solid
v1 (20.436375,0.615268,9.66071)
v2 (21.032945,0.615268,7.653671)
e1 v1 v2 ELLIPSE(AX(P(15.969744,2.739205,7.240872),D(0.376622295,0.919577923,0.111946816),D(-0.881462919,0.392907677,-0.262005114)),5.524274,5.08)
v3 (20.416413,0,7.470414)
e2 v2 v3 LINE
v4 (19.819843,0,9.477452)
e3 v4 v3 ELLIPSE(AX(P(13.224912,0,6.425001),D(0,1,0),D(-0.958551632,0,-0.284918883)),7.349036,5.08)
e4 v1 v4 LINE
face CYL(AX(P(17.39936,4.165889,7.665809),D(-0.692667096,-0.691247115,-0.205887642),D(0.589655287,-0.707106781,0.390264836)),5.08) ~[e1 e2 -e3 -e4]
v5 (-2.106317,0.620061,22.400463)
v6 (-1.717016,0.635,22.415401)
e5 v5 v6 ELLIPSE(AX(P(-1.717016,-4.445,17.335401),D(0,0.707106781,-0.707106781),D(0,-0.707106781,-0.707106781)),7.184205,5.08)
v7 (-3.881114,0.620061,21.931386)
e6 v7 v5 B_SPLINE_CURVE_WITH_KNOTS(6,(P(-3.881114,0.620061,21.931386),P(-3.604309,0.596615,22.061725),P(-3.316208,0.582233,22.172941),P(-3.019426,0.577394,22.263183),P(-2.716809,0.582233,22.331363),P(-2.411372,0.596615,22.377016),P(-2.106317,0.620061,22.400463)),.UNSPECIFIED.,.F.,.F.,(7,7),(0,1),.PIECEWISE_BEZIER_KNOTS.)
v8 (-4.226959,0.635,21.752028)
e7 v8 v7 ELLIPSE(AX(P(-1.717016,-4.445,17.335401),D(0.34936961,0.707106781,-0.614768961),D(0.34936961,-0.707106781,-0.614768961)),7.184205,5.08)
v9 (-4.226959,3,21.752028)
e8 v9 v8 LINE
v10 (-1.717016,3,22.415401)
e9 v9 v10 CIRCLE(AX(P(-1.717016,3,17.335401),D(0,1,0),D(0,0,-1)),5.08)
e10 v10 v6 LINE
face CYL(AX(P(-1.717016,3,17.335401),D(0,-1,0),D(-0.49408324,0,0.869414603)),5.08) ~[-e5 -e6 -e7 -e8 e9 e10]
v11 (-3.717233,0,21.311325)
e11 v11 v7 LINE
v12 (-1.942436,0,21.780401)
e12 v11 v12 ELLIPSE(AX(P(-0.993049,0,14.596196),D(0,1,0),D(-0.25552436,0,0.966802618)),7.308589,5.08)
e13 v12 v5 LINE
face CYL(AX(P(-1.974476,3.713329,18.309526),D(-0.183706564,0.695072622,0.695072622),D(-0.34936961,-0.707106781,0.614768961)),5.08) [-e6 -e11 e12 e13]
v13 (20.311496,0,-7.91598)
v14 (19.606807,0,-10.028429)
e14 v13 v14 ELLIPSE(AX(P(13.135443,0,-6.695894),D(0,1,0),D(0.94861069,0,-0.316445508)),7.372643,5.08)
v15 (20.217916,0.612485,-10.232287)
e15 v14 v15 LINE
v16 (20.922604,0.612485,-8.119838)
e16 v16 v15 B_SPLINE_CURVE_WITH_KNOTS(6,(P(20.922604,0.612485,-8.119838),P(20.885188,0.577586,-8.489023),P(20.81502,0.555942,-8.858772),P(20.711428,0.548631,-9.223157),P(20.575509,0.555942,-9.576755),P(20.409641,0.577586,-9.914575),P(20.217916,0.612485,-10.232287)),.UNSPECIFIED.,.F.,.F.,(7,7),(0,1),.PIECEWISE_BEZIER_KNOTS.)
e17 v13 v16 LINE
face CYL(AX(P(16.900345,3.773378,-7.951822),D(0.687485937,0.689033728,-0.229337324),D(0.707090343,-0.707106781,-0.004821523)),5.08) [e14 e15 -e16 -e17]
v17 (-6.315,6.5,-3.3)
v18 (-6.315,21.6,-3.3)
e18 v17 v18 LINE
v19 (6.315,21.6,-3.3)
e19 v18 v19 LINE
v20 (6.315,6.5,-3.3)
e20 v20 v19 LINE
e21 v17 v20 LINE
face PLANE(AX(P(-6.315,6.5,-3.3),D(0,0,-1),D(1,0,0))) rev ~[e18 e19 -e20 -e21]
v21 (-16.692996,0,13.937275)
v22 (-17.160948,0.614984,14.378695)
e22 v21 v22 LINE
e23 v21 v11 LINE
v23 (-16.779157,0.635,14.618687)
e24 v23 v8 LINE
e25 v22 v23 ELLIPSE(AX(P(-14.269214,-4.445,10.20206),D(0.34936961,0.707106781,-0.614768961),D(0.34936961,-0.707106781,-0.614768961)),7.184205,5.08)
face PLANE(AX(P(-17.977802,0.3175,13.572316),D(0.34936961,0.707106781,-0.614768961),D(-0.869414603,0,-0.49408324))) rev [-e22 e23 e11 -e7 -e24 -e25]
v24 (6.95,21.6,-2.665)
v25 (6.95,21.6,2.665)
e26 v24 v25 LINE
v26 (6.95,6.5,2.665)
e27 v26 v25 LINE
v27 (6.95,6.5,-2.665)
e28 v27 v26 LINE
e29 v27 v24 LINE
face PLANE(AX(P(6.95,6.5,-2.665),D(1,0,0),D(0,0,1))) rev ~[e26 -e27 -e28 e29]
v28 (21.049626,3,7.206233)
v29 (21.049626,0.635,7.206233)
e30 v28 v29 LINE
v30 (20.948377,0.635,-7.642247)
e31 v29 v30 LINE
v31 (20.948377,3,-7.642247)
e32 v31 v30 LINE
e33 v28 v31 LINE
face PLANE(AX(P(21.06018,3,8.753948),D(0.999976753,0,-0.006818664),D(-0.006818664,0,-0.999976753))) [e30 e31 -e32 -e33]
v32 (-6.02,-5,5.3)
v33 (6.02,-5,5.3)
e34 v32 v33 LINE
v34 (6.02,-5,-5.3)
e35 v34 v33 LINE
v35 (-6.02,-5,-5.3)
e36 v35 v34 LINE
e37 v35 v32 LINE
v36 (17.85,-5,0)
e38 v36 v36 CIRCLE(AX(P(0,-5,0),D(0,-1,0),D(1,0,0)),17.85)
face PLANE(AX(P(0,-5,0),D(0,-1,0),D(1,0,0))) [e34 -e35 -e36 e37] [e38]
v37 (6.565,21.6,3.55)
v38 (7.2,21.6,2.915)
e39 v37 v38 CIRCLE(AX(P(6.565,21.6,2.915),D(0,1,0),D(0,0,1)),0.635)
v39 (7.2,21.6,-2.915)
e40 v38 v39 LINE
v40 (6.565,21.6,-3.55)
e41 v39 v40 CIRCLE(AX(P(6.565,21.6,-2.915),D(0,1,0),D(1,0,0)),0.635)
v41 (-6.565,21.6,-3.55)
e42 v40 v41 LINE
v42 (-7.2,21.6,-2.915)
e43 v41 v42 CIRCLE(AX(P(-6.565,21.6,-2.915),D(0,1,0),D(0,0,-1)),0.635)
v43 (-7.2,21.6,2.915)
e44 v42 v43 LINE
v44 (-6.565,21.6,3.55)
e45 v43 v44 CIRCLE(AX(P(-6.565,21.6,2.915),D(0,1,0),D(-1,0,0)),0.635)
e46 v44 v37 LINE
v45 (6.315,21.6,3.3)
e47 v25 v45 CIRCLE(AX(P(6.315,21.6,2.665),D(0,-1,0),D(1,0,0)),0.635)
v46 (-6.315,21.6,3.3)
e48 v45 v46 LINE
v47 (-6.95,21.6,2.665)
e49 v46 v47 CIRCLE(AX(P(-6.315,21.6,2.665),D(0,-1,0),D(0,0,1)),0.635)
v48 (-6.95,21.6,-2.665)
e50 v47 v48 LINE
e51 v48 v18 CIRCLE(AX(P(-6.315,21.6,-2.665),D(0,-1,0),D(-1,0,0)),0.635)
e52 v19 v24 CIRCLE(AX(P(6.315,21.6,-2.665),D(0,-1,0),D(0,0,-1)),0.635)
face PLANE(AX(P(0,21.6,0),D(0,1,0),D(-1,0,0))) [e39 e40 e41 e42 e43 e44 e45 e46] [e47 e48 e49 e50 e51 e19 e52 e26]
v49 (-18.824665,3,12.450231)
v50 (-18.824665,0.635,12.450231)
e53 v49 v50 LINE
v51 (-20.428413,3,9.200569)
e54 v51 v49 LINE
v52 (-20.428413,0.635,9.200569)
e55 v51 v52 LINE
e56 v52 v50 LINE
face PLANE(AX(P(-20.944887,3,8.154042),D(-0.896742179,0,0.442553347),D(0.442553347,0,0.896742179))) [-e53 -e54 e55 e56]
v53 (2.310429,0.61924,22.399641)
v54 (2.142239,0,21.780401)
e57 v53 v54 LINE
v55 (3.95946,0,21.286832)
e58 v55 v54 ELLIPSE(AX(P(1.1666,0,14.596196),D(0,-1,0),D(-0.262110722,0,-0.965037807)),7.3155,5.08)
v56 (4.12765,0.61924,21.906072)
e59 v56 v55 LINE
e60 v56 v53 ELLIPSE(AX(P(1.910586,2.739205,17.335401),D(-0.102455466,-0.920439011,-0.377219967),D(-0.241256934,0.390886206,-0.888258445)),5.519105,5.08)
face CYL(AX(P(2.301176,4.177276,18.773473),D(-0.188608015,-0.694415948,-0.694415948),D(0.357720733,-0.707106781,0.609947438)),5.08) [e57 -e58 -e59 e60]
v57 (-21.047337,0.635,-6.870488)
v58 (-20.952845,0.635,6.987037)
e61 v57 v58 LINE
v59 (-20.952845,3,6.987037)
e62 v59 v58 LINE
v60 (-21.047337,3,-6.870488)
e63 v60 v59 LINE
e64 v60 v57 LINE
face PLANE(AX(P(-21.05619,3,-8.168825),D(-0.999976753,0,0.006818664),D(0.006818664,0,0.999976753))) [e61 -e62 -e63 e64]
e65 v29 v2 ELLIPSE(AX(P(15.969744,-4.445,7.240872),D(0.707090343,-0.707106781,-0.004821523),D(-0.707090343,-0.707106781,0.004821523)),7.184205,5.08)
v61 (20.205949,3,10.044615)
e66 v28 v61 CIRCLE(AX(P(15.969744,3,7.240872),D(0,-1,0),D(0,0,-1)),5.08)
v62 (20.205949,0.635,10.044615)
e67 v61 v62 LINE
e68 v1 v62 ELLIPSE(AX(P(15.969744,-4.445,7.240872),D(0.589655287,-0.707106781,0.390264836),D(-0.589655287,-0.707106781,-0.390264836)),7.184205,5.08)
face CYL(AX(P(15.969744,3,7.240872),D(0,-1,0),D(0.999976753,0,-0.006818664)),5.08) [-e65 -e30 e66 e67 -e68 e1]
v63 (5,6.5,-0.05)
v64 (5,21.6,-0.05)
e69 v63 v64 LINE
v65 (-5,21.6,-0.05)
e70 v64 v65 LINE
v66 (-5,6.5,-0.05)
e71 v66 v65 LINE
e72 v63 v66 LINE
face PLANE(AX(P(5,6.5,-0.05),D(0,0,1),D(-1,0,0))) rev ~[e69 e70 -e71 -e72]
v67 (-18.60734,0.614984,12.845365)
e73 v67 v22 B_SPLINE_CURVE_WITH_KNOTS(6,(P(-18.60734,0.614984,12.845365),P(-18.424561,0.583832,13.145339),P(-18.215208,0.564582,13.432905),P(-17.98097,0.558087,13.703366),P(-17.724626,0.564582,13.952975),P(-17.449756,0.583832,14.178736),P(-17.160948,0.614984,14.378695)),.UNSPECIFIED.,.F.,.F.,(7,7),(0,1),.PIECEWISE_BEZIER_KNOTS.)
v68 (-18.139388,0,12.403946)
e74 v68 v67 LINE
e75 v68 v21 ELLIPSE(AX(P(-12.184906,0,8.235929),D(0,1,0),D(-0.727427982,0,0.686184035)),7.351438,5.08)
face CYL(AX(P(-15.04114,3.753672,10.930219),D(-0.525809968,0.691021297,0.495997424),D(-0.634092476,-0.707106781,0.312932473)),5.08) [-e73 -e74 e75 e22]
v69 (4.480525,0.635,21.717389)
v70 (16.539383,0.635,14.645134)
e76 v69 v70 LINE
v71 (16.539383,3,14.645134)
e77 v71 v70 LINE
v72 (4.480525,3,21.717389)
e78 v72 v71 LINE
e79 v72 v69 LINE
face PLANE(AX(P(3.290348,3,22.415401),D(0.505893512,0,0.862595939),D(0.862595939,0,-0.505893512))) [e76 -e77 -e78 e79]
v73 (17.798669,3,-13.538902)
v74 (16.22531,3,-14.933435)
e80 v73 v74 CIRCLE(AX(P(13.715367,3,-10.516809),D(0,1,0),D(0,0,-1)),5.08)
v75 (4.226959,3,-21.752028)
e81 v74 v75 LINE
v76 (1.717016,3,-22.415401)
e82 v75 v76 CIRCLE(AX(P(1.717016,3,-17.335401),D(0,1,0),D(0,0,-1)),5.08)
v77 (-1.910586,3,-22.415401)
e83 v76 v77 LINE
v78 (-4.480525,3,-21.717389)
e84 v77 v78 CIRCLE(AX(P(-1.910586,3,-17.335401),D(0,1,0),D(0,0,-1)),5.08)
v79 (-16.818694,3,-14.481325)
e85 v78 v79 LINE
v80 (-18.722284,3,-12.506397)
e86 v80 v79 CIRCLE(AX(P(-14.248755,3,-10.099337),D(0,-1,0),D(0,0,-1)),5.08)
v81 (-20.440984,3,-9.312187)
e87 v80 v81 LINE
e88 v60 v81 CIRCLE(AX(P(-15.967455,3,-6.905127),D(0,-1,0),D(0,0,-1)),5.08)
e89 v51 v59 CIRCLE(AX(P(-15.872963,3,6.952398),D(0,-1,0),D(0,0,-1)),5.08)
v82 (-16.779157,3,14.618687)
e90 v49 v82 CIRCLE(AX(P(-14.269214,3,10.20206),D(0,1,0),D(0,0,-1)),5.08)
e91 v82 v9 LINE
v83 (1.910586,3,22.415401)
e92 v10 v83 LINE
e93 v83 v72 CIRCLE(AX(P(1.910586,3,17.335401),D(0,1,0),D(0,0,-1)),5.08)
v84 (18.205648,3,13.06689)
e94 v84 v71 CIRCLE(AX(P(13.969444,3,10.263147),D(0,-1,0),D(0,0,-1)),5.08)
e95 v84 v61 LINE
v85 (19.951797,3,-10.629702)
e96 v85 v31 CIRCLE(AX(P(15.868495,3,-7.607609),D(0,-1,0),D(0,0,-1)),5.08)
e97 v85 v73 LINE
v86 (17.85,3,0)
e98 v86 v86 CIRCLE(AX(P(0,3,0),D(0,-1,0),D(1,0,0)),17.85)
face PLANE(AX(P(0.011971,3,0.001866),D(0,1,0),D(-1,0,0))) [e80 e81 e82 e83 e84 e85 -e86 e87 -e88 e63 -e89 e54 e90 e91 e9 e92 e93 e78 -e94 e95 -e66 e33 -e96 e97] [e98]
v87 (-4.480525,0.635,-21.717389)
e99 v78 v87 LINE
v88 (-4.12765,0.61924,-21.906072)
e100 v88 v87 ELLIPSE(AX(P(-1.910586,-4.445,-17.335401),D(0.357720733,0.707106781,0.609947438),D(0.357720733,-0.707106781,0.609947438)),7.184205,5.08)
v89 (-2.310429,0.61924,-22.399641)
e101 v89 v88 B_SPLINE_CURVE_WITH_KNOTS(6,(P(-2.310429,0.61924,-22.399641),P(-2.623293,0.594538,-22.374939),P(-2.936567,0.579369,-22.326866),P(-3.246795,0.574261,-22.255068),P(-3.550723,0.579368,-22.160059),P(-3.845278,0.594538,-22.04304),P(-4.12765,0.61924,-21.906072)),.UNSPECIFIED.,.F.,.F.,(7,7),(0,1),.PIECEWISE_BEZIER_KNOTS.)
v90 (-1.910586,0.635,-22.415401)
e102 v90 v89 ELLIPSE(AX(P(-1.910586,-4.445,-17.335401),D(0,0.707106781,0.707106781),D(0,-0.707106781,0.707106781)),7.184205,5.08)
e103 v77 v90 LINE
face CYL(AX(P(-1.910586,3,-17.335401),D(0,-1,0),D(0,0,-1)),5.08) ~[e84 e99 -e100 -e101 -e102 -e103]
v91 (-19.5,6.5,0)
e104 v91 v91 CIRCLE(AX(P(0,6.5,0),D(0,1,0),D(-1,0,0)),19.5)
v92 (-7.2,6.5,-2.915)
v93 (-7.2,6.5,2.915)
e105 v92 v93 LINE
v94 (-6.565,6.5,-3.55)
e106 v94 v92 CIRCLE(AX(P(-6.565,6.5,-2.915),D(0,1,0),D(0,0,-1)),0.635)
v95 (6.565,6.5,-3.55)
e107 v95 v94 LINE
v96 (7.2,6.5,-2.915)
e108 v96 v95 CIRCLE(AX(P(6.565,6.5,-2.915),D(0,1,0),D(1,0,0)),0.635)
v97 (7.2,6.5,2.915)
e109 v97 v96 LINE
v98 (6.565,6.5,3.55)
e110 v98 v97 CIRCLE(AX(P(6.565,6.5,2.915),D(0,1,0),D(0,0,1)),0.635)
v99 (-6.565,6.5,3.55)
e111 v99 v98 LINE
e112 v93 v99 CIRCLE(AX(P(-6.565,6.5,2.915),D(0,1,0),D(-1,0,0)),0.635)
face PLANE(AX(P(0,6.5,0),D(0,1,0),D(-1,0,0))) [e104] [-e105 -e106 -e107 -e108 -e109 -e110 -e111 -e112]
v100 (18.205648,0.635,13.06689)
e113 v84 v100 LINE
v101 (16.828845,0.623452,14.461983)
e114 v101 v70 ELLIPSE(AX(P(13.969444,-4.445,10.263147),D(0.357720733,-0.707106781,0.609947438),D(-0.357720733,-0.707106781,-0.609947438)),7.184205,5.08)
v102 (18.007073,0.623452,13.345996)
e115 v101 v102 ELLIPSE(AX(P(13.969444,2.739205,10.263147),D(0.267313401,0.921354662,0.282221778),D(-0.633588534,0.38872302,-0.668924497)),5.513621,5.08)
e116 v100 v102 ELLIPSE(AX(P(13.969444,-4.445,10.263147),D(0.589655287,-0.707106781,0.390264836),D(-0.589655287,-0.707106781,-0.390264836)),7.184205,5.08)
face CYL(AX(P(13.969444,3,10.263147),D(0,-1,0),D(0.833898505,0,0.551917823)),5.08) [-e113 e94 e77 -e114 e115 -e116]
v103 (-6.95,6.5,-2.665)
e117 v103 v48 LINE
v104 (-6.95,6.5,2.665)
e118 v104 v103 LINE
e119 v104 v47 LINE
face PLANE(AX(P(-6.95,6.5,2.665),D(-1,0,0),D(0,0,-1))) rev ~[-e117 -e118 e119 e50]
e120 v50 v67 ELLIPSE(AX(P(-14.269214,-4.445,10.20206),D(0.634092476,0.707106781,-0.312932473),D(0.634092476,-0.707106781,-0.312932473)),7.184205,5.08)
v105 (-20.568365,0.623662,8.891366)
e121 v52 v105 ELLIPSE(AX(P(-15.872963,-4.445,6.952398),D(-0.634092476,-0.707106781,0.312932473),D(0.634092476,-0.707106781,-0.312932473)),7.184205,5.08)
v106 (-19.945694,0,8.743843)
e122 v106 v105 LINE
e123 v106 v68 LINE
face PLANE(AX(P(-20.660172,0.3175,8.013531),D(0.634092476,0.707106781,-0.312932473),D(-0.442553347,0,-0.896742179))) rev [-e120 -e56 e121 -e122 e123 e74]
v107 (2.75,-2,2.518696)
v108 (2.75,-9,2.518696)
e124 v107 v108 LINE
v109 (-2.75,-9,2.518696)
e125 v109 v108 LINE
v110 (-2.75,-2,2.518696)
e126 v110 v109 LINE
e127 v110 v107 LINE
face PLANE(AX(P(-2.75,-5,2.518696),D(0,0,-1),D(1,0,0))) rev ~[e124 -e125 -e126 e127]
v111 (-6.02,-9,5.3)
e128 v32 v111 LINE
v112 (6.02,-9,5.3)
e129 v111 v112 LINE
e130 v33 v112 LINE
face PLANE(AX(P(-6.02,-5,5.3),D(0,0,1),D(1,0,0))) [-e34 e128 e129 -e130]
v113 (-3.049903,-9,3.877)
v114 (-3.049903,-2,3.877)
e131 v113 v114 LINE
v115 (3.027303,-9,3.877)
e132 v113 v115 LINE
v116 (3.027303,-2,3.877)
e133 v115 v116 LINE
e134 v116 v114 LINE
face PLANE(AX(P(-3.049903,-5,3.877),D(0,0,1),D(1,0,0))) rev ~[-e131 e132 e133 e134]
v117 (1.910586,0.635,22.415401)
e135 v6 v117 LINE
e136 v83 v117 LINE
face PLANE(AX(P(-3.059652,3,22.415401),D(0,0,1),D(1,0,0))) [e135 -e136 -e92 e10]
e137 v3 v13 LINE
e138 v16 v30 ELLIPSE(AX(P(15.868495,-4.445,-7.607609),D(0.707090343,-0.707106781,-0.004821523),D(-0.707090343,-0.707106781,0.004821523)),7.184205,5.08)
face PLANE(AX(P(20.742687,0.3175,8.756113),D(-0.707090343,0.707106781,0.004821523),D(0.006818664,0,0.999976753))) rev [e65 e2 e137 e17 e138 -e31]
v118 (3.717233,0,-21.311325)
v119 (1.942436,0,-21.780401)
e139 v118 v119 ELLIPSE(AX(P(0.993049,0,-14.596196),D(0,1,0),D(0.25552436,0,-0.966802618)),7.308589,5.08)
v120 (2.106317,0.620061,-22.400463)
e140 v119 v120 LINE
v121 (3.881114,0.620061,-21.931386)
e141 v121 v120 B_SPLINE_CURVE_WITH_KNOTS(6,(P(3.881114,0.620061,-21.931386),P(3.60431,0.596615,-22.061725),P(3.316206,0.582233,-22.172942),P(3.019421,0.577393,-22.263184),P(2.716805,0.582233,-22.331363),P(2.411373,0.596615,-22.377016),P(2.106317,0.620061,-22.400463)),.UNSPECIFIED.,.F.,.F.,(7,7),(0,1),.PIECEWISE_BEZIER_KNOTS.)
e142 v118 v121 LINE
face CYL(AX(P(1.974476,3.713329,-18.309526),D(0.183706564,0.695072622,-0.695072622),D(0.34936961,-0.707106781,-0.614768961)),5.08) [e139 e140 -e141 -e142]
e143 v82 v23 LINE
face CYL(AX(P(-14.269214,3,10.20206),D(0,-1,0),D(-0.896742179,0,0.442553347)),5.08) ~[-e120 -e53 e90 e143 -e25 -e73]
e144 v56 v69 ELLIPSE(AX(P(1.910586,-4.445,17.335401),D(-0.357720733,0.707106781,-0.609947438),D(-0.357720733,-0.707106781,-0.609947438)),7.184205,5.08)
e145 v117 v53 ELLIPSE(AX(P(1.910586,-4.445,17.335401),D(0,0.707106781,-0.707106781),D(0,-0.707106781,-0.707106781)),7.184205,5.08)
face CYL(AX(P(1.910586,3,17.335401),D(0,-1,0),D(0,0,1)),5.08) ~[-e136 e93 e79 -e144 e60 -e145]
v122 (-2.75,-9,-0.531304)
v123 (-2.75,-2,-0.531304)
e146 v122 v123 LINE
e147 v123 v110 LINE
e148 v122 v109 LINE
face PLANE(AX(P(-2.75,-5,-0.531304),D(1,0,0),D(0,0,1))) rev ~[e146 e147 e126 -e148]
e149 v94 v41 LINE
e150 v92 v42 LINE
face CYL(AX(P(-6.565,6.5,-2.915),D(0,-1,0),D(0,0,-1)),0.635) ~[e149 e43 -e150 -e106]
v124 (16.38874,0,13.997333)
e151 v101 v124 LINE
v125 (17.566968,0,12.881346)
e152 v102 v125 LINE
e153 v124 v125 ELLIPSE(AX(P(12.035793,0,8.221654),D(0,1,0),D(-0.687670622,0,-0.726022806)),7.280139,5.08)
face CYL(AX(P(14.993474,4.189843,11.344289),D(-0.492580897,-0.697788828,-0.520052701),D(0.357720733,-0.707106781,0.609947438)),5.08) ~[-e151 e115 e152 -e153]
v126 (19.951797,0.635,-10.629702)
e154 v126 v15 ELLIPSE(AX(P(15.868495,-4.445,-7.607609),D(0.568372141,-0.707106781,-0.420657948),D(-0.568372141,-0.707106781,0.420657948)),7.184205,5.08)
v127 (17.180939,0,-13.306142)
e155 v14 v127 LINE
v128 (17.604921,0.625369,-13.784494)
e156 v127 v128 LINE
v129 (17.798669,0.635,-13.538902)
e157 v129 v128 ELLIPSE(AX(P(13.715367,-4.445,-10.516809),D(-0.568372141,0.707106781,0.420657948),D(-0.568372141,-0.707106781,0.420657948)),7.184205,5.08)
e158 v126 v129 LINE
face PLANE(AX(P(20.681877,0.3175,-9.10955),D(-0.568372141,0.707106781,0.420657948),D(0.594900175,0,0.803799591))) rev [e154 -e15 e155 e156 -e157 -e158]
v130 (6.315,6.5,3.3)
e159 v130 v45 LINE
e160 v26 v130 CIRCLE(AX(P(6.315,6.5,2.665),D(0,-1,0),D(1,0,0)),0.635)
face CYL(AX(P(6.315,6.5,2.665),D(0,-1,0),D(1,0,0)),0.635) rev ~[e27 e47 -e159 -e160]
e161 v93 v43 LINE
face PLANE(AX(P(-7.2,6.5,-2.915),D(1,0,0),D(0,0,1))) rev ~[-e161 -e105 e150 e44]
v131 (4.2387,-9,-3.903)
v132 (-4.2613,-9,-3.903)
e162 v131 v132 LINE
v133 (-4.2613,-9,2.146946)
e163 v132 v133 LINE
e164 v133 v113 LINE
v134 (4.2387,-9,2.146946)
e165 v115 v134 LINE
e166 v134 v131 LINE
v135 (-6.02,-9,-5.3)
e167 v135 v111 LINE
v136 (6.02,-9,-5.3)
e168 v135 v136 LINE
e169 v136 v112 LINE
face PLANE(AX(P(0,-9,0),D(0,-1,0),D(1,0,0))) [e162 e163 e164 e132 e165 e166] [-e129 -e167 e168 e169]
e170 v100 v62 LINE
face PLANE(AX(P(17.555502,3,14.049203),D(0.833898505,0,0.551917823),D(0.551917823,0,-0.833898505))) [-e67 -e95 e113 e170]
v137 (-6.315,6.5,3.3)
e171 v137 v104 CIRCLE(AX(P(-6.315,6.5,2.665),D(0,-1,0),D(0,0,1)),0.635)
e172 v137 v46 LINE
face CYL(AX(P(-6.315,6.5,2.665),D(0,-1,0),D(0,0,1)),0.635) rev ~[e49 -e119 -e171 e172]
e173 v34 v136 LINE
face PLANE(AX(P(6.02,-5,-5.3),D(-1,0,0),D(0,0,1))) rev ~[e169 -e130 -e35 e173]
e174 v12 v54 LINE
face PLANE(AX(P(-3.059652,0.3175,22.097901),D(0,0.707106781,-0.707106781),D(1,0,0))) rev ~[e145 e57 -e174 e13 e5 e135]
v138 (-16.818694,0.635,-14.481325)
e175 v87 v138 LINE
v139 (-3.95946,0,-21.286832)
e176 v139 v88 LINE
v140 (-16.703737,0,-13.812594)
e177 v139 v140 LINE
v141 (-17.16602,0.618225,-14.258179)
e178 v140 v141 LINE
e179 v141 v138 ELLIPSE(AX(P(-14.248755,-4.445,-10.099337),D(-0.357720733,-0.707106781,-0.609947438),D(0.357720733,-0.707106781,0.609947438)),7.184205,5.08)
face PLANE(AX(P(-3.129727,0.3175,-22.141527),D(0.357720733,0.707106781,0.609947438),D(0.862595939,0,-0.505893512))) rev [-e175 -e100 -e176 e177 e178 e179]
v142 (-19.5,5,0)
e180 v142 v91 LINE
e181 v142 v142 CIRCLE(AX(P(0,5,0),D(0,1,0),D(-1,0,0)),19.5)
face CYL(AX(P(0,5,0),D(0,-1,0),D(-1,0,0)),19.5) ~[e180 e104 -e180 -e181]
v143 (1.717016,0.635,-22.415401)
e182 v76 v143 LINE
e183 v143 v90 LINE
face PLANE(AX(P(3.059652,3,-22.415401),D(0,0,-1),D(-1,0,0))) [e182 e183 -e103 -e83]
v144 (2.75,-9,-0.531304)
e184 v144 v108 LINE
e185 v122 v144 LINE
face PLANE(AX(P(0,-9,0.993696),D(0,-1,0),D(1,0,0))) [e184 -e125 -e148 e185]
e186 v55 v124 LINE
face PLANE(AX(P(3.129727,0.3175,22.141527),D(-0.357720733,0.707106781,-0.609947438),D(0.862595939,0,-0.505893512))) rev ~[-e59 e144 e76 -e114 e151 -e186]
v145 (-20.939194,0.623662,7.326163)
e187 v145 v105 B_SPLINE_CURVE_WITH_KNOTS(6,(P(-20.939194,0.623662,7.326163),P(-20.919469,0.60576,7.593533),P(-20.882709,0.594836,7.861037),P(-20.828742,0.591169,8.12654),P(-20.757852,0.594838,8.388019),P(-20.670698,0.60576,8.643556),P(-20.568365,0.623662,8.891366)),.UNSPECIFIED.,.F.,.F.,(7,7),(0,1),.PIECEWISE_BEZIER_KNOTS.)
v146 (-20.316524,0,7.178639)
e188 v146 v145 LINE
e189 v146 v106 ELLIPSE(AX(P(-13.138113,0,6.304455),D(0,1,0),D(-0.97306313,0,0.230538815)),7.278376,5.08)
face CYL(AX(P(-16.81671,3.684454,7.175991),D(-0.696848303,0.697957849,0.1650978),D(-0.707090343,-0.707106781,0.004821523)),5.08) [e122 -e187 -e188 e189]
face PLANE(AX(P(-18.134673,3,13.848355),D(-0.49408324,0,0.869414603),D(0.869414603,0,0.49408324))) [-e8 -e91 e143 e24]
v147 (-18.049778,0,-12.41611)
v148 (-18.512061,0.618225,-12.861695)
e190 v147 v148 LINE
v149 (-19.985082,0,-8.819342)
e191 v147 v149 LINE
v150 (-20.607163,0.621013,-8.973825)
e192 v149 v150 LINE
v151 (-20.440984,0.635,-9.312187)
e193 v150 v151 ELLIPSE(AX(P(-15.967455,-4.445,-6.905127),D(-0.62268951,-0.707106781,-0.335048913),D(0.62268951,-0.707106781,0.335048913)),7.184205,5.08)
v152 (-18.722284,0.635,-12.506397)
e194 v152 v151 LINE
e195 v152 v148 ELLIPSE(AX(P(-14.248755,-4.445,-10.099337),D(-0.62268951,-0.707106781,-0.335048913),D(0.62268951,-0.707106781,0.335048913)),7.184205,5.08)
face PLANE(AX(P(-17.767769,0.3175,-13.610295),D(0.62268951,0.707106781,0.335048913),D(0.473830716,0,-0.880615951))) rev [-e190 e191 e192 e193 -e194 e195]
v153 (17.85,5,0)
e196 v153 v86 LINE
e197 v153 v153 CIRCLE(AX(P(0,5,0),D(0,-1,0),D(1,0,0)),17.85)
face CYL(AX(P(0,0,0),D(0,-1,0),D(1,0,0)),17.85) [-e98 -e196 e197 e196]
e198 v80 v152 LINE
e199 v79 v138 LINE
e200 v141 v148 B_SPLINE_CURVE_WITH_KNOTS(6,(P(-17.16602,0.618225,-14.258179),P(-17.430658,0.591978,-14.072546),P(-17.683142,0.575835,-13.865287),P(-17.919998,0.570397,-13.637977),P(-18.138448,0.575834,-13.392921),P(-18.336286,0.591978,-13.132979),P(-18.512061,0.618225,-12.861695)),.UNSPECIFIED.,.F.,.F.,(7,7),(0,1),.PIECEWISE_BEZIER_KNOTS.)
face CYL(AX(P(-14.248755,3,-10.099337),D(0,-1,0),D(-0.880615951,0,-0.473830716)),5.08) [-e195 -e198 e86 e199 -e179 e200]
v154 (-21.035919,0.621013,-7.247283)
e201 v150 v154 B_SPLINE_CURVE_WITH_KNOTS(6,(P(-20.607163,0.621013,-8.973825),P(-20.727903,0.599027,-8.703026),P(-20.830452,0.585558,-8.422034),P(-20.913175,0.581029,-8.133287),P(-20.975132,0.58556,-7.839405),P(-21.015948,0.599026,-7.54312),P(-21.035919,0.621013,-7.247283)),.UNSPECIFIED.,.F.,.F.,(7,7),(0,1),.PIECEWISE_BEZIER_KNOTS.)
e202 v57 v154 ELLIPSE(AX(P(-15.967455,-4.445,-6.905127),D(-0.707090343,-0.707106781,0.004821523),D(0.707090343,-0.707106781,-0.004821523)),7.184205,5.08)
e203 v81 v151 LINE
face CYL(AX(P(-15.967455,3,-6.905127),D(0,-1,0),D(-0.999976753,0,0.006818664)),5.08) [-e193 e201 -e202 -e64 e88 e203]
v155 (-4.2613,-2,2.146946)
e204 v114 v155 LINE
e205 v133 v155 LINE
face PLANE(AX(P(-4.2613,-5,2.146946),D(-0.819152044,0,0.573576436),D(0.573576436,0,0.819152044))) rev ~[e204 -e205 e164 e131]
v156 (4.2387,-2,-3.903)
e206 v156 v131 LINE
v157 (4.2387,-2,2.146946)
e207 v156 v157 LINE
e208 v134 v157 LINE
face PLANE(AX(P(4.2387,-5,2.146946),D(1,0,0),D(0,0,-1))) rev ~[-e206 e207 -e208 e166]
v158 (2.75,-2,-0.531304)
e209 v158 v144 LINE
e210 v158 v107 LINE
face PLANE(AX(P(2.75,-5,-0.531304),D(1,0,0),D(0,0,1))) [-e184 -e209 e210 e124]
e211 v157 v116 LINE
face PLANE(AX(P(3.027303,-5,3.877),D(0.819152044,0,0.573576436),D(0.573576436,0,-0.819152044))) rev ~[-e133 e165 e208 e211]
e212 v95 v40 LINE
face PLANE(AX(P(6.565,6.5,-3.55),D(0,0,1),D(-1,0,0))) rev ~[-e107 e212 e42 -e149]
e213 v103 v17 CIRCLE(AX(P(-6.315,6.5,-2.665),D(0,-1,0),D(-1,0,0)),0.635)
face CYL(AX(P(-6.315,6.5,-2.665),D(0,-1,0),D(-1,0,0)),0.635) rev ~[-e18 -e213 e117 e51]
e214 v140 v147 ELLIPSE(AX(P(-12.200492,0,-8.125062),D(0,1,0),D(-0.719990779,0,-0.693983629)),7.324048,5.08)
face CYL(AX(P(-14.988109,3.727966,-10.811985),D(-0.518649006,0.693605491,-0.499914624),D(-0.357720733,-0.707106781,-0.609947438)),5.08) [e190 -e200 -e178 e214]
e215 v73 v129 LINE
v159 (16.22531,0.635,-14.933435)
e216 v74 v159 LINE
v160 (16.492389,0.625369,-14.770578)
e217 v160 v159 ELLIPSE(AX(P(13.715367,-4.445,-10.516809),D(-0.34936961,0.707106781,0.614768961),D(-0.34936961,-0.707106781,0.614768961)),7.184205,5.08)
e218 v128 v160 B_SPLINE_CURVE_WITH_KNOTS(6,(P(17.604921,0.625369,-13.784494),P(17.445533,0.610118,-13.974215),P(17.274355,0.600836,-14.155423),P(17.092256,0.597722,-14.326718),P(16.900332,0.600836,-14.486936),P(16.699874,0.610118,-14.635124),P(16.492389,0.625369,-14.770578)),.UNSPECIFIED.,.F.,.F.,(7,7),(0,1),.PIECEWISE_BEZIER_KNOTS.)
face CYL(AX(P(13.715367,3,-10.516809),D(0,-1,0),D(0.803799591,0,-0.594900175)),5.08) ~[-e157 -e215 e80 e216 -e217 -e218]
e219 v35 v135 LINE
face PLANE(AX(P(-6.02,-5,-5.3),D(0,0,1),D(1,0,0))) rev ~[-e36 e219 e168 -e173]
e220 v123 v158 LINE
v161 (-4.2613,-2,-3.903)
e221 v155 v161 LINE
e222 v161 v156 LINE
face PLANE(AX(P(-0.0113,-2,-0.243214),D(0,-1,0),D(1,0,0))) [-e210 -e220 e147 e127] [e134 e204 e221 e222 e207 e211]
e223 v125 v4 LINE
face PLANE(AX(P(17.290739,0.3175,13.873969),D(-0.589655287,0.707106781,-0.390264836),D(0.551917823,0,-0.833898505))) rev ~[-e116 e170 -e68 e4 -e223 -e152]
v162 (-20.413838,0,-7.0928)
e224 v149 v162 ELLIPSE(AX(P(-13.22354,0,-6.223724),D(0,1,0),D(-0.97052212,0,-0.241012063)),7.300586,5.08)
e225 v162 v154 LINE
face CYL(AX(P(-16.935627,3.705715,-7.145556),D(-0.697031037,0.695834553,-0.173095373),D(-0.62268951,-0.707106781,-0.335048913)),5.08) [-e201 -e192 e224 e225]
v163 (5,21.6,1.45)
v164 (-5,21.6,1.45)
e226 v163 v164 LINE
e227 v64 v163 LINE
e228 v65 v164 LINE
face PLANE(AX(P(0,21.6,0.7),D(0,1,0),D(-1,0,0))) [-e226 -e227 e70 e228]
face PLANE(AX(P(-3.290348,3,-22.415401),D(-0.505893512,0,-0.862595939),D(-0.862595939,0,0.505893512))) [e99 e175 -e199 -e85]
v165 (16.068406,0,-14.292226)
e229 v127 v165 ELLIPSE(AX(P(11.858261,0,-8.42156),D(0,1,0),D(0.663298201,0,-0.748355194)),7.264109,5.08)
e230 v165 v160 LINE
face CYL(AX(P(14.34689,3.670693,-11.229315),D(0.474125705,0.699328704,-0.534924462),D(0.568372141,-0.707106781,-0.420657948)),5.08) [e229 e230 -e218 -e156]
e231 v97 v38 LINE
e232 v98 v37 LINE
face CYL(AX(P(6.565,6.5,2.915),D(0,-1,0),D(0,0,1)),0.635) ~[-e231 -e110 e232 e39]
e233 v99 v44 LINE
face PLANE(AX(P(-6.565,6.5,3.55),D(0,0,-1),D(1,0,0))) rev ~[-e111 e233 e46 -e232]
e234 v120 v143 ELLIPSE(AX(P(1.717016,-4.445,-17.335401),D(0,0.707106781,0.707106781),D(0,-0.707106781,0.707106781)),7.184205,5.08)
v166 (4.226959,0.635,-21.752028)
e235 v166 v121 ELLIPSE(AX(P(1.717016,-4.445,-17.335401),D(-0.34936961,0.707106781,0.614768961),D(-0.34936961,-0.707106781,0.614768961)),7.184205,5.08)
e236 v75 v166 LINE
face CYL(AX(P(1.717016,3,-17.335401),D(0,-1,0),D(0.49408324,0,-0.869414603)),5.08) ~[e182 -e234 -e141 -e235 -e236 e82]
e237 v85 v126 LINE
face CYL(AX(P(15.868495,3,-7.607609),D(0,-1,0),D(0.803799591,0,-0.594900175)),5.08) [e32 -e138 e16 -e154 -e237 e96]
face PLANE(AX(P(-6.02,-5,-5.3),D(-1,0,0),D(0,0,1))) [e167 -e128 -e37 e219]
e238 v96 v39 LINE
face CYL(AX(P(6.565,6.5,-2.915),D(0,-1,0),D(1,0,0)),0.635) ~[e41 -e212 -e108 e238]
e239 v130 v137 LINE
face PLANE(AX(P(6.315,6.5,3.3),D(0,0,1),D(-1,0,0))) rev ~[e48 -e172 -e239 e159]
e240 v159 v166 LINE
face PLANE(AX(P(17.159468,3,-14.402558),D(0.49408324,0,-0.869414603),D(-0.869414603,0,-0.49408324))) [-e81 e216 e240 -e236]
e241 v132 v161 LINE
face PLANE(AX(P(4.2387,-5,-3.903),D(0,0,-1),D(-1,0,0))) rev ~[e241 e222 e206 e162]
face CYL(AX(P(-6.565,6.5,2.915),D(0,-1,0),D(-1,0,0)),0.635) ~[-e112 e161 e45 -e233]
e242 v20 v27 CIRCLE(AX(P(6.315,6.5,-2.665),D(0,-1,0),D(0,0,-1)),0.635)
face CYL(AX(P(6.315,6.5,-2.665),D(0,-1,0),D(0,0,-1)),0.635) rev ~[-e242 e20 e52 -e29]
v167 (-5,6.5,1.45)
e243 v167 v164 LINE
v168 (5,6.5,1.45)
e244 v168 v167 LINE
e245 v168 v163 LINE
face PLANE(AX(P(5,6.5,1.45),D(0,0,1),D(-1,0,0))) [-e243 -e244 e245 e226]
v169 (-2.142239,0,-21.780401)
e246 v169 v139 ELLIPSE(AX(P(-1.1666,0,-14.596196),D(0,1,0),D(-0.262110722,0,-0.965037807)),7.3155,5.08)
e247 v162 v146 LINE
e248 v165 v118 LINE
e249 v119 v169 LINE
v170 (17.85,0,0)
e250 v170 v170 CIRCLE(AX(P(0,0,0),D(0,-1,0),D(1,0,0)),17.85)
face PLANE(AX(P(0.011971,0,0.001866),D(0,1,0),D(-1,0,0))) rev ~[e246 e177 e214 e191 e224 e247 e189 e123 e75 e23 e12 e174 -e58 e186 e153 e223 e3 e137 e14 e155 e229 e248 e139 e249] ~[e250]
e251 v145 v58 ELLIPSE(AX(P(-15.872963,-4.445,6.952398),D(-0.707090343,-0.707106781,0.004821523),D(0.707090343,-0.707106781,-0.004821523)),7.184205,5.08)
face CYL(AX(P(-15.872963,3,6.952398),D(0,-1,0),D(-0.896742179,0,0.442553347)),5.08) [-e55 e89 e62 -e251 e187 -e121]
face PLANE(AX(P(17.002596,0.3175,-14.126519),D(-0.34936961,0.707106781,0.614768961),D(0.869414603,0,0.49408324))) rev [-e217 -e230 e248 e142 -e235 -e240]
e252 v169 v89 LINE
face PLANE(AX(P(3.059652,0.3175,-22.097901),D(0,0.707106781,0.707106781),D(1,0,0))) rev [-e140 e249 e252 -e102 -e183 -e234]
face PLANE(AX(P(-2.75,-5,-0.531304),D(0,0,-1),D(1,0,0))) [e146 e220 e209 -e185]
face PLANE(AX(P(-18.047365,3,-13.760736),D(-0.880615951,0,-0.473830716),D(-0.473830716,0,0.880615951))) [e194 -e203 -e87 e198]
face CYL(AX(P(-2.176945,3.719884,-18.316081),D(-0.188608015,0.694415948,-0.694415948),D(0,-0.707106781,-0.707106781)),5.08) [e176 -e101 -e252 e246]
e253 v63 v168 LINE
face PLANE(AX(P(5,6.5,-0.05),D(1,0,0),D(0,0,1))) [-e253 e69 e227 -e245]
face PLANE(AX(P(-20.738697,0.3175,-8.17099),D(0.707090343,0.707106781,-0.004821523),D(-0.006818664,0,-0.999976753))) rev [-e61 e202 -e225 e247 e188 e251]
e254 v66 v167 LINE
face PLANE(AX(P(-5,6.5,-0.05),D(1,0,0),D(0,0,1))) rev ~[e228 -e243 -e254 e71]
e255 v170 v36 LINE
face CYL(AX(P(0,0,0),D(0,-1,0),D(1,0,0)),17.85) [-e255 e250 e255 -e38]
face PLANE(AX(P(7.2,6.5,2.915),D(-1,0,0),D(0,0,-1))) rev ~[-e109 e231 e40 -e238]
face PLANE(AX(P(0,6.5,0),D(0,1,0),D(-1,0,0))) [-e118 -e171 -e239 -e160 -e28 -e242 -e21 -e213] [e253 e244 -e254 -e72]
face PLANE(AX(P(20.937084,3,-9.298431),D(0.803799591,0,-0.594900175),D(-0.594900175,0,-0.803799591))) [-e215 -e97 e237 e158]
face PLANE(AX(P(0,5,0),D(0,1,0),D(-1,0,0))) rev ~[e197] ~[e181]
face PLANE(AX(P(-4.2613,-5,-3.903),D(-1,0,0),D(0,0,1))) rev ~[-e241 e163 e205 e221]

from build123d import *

# Parameters (mm, degrees)
F0_R      = 17.85
F1_DEPTH  = 5
F4_DEPTH  = 3
F5_SIZE   = 0.635
F6_F1_R   = 5.08
F6_F2_R   = 5.08
F6_F3_R   = 5.08
F6_F4_R   = 5.08
F6_F5_R   = 5.08
F6_F6_R   = 5.08
F6_F7_R   = 5.08
F6_F8_R   = 5.08
F6_F9_R   = 5.08
F6_F10_R  = 5.08
F6_F11_R  = 5.08
F6_F12_R  = 5.08
F6_F13_R  = 5.08
F6_F14_R  = 5.08
F6_F15_R  = 5.08
F6_F16_R  = 5.08
F6_F17_R  = 5.08
F6_F18_R  = 5.08
F6_F19_R  = 5.08
F6_F20_R  = 5.08
F6_F21_R  = 5.08
F6_F22_R  = 5.08
F6_F23_R  = 5.08
F6_F24_R  = 5.08
F7_R      = 19.5
F8_DEPTH  = 1.5
F9_W      = 12.04
F9_H      = 10.6
F9_W_2    = 5.5
F9_H_2    = 3.05
F10_DEPTH = 4
F11_DEPTH = 3
F12_W     = 10
F12_H     = 1.5
F13_DEPTH = 15.1


with BuildPart() as f1:
    # F0 (on Front) → F1 (new body, symmetric)
    with BuildSketch(Plane.XZ):
        Circle(F0_R)
    extrude(amount=F1_DEPTH, both=True)

    # F3 (on offset) → F4 (join)
    with BuildSketch(Plane(origin=(0, 3, 0), x_dir=(-1, 0, 0), z_dir=(0, 1, 0))):
        Polygon((-3.2903481497, 22.4154013943), (-17.5555016387, 14.0492031865), (-21.0601798177, 8.7539476816), (-20.9370838593, -9.2984309735), (-17.1594677511, -14.4025583758), (-3.0596518503, -22.4154013943), (3.2903481497, -22.4154013943), (18.0473649217, -13.7607362086), (21.0561899697, -8.1688249226), (20.9448872454, 8.1540418144), (18.1346734923, 13.8483546493), (3.0596518503, 22.4154013943), align=None)
    extrude(amount=-F4_DEPTH)

    # F5
    f5_edges = [f1.edges().sort_by_distance(p)[0] for p in [
        (10.422925, 0, 18.232302),
        (19.307841, 0, 11.401575),
        (20.998632, 0, -0.272242),
        (19.048276, 0, -11.850495),
        (10.10956, 0, -18.40898),
        (-0.115348, 0, -22.415401),
        (-10.668857, 0, -18.088069),
        (-19.551777, 0, -10.964781),
        (-21.000539, 0, -0.007392),
        (-19.53978, 0, 11.001198),
        (-10.597163, 0, 18.131878),
        (0.115348, 0, 22.415401),
    ]]
    chamfer(f5_edges, length=F5_SIZE)

    # F6: fillet of radius 5.08 on 24 edges, made by hand

    # F6_f1
    f6_f1_edges = [f1.edges().sort_by_distance(p)[0] for p in [
        (-20.9448872454, 1.8175, 8.1540418144),
    ]]
    fillet(f6_f1_edges, radius=F6_F1_R)

    # F6_f2
    f6_f2_edges = [f1.edges().sort_by_distance(p)[0] for p in [
        (-18.1346734923, 1.8175, 13.8483546493),
    ]]
    fillet(f6_f2_edges, radius=F6_F2_R)

    # F6_f3
    f6_f3_edges = [f1.edges().sort_by_distance(p)[0] for p in [
        (-21.0561899697, 1.8175, -8.1688249226),
    ]]
    fillet(f6_f3_edges, radius=F6_F3_R)

    # F6_f4
    f6_f4_edges = [f1.edges().sort_by_distance(p)[0] for p in [
        (-20.5635101748, 0.2530156874, 8.0636856851),
    ]]
    fillet(f6_f4_edges, radius=F6_F4_R)

    # F6_f5
    f6_f5_edges = [f1.edges().sort_by_distance(p)[0] for p in [
        (-17.80801976, 0.205710524, 13.540221636),
    ]]
    fillet(f6_f5_edges, radius=F6_F5_R)

    # F6_f6
    f6_f6_edges = [f1.edges().sort_by_distance(p)[0] for p in [
        (-3.0596518503, 1.8175, 22.4154013943),
    ]]
    fillet(f6_f6_edges, radius=F6_F6_R)

    # F6_f7
    f6_f7_edges = [f1.edges().sort_by_distance(p)[0] for p in [
        (-18.0473649217, 1.8175, -13.7607362086),
    ]]
    fillet(f6_f7_edges, radius=F6_F7_R)

    # F6_f8
    f6_f8_edges = [f1.edges().sort_by_distance(p)[0] for p in [
        (-20.6589027008, 0.2383946915, -8.0701656315),
    ]]
    fillet(f6_f8_edges, radius=F6_F8_R)

    # F6_f9
    f6_f9_edges = [f1.edges().sort_by_distance(p)[0] for p in [
        (-2.9534511203, 0.2331786487, 22.013580043),
    ]]
    fillet(f6_f9_edges, radius=F6_F9_R)

    # F6_f10
    f6_f10_edges = [f1.edges().sort_by_distance(p)[0] for p in [
        (3.2903481497, 1.8175, 22.4154013943),
    ]]
    fillet(f6_f10_edges, radius=F6_F10_R)

    # F6_f11
    f6_f11_edges = [f1.edges().sort_by_distance(p)[0] for p in [
        (-3.2903481497, 1.8175, -22.4154013943),
    ]]
    fillet(f6_f11_edges, radius=F6_F11_R)

    # F6_f12
    f6_f12_edges = [f1.edges().sort_by_distance(p)[0] for p in [
        (17.5555016387, 1.8175, 14.0492031865),
    ]]
    fillet(f6_f12_edges, radius=F6_F12_R)

    # F6_f13
    f6_f13_edges = [f1.edges().sort_by_distance(p)[0] for p in [
        (3.0596518503, 1.8175, -22.4154013943),
    ]]
    fillet(f6_f13_edges, radius=F6_F13_R)

    # F6_f14
    f6_f14_edges = [f1.edges().sort_by_distance(p)[0] for p in [
        (21.0601798177, 1.8175, 8.7539476816),
    ]]
    fillet(f6_f14_edges, radius=F6_F14_R)

    # F6_f15
    f6_f15_edges = [f1.edges().sort_by_distance(p)[0] for p in [
        (17.1594677511, 1.8175, -14.4025583758),
    ]]
    fillet(f6_f15_edges, radius=F6_F15_R)

    # F6_f16
    f6_f16_edges = [f1.edges().sort_by_distance(p)[0] for p in [
        (20.9370838593, 1.8175, -9.2984309735),
    ]]
    fillet(f6_f16_edges, radius=F6_F16_R)

    # F6_f17
    f6_f17_edges = [f1.edges().sort_by_distance(p)[0] for p in [
        (-17.7394232188, 0.2231799565, -13.4639178232),
    ]]
    fillet(f6_f17_edges, radius=F6_F17_R)

    # F6_f18
    f6_f18_edges = [f1.edges().sort_by_distance(p)[0] for p in [
        (3.1799932747, 0.2286960306, 22.009097425),
    ]]
    fillet(f6_f18_edges, radius=F6_F18_R)

    # F6_f19
    f6_f19_edges = [f1.edges().sort_by_distance(p)[0] for p in [
        (17.2850276, 0.2518471741, 13.7636444987),
    ]]
    fillet(f6_f19_edges, radius=F6_F19_R)

    # F6_f20
    f6_f20_edges = [f1.edges().sort_by_distance(p)[0] for p in [
        (20.6315309968, 0.2072299177, 8.6265365553),
    ]]
    fillet(f6_f20_edges, radius=F6_F20_R)

    # F6_f21
    f6_f21_edges = [f1.edges().sort_by_distance(p)[0] for p in [
        (20.4954738766, 0.1923957856, -9.1511150124),
    ]]
    fillet(f6_f21_edges, radius=F6_F21_R)

    # F6_f22
    f6_f22_edges = [f1.edges().sort_by_distance(p)[0] for p in [
        (16.9069384559, 0.262522864, -14.1176463871),
    ]]
    fillet(f6_f22_edges, radius=F6_F22_R)

    # F6_f23
    f6_f23_edges = [f1.edges().sort_by_distance(p)[0] for p in [
        (2.9534511203, 0.2331786487, -22.013580043),
    ]]
    fillet(f6_f23_edges, radius=F6_F23_R)

    # F6_f24
    f6_f24_edges = [f1.edges().sort_by_distance(p)[0] for p in [
        (-3.1799932747, 0.2286960306, -22.009097425),
    ]]
    fillet(f6_f24_edges, radius=F6_F24_R)

    # F7 (on face) → F8 (join)
    with BuildSketch(Plane(origin=(0, 5, 0), x_dir=(-1, 0, 0), z_dir=(0, 1, 0))):
        Circle(F7_R)
    extrude(amount=F8_DEPTH)

    # F9 (on face) → F10 (join)
    with BuildSketch(Plane.XZ.offset(5)):
        Rectangle(F9_W, F9_H)
        Polygon((4.2387, -3.903), (-4.2613, -3.903), (-4.2613, 2.1469455678), (-3.0499028451, 3.877), (3.0273028451, 3.877), (4.2387, 2.1469455678), align=None, mode=Mode.SUBTRACT)
        with Locations((0, 0.9936958086)):
            Rectangle(F9_W_2, F9_H_2)
    extrude(amount=F10_DEPTH)

    # F9 (on face) → F11 (cut)
    with BuildSketch(Plane.XZ.offset(5)):
        Polygon((-4.2613, 2.1469455678), (-4.2613, -3.903), (4.2387, -3.903), (4.2387, 2.1469455678), (3.0273028451, 3.877), (-3.0499028451, 3.877), align=None)
        with Locations((0, 0.9936958086)):
            Rectangle(F9_W_2, F9_H_2, mode=Mode.SUBTRACT)
    extrude(amount=-F11_DEPTH, mode=Mode.SUBTRACT)

    # F12 (on face) → F13 (join)
    with BuildSketch(Plane(origin=(0, 6.5, 0), x_dir=(-1, 0, 0), z_dir=(0, 1, 0))):
        with BuildLine():
            Line((6.565, 3.55), (-6.565, 3.55))
            ThreePointArc((-6.565, 3.55), (-7.0140128061, 3.3640128061), (-7.2, 2.915))
            Line((-7.2, 2.915), (-7.2, -2.915))
            ThreePointArc((-7.2, -2.915), (-7.0140128061, -3.3640128061), (-6.565, -3.55))
            Line((-6.565, -3.55), (6.565, -3.55))
            ThreePointArc((6.565, -3.55), (7.0140128061, -3.3640128061), (7.2, -2.915))
            Line((7.2, -2.915), (7.2, 2.915))
            ThreePointArc((7.2, 2.915), (7.0140128061, 3.3640128061), (6.565, 3.55))
        make_face()
        with BuildLine():
            ThreePointArc((-6.95, 2.665), (-6.7640128061, 3.1140128061), (-6.315, 3.3))
            Line((-6.315, 3.3), (6.315, 3.3))
            ThreePointArc((6.315, 3.3), (6.7640128061, 3.1140128061), (6.95, 2.665))
            Line((6.95, 2.665), (6.95, -2.665))
            ThreePointArc((6.95, -2.665), (6.7640128061, -3.1140128061), (6.315, -3.3))
            Line((6.315, -3.3), (-6.315, -3.3))
            ThreePointArc((-6.315, -3.3), (-6.7640128061, -3.1140128061), (-6.95, -2.665))
            Line((-6.95, -2.665), (-6.95, 2.665))
        make_face(mode=Mode.SUBTRACT)
        with Locations((0, 0.7)):
            Rectangle(F12_W, F12_H)
    extrude(amount=F13_DEPTH)


solid = f1.part
